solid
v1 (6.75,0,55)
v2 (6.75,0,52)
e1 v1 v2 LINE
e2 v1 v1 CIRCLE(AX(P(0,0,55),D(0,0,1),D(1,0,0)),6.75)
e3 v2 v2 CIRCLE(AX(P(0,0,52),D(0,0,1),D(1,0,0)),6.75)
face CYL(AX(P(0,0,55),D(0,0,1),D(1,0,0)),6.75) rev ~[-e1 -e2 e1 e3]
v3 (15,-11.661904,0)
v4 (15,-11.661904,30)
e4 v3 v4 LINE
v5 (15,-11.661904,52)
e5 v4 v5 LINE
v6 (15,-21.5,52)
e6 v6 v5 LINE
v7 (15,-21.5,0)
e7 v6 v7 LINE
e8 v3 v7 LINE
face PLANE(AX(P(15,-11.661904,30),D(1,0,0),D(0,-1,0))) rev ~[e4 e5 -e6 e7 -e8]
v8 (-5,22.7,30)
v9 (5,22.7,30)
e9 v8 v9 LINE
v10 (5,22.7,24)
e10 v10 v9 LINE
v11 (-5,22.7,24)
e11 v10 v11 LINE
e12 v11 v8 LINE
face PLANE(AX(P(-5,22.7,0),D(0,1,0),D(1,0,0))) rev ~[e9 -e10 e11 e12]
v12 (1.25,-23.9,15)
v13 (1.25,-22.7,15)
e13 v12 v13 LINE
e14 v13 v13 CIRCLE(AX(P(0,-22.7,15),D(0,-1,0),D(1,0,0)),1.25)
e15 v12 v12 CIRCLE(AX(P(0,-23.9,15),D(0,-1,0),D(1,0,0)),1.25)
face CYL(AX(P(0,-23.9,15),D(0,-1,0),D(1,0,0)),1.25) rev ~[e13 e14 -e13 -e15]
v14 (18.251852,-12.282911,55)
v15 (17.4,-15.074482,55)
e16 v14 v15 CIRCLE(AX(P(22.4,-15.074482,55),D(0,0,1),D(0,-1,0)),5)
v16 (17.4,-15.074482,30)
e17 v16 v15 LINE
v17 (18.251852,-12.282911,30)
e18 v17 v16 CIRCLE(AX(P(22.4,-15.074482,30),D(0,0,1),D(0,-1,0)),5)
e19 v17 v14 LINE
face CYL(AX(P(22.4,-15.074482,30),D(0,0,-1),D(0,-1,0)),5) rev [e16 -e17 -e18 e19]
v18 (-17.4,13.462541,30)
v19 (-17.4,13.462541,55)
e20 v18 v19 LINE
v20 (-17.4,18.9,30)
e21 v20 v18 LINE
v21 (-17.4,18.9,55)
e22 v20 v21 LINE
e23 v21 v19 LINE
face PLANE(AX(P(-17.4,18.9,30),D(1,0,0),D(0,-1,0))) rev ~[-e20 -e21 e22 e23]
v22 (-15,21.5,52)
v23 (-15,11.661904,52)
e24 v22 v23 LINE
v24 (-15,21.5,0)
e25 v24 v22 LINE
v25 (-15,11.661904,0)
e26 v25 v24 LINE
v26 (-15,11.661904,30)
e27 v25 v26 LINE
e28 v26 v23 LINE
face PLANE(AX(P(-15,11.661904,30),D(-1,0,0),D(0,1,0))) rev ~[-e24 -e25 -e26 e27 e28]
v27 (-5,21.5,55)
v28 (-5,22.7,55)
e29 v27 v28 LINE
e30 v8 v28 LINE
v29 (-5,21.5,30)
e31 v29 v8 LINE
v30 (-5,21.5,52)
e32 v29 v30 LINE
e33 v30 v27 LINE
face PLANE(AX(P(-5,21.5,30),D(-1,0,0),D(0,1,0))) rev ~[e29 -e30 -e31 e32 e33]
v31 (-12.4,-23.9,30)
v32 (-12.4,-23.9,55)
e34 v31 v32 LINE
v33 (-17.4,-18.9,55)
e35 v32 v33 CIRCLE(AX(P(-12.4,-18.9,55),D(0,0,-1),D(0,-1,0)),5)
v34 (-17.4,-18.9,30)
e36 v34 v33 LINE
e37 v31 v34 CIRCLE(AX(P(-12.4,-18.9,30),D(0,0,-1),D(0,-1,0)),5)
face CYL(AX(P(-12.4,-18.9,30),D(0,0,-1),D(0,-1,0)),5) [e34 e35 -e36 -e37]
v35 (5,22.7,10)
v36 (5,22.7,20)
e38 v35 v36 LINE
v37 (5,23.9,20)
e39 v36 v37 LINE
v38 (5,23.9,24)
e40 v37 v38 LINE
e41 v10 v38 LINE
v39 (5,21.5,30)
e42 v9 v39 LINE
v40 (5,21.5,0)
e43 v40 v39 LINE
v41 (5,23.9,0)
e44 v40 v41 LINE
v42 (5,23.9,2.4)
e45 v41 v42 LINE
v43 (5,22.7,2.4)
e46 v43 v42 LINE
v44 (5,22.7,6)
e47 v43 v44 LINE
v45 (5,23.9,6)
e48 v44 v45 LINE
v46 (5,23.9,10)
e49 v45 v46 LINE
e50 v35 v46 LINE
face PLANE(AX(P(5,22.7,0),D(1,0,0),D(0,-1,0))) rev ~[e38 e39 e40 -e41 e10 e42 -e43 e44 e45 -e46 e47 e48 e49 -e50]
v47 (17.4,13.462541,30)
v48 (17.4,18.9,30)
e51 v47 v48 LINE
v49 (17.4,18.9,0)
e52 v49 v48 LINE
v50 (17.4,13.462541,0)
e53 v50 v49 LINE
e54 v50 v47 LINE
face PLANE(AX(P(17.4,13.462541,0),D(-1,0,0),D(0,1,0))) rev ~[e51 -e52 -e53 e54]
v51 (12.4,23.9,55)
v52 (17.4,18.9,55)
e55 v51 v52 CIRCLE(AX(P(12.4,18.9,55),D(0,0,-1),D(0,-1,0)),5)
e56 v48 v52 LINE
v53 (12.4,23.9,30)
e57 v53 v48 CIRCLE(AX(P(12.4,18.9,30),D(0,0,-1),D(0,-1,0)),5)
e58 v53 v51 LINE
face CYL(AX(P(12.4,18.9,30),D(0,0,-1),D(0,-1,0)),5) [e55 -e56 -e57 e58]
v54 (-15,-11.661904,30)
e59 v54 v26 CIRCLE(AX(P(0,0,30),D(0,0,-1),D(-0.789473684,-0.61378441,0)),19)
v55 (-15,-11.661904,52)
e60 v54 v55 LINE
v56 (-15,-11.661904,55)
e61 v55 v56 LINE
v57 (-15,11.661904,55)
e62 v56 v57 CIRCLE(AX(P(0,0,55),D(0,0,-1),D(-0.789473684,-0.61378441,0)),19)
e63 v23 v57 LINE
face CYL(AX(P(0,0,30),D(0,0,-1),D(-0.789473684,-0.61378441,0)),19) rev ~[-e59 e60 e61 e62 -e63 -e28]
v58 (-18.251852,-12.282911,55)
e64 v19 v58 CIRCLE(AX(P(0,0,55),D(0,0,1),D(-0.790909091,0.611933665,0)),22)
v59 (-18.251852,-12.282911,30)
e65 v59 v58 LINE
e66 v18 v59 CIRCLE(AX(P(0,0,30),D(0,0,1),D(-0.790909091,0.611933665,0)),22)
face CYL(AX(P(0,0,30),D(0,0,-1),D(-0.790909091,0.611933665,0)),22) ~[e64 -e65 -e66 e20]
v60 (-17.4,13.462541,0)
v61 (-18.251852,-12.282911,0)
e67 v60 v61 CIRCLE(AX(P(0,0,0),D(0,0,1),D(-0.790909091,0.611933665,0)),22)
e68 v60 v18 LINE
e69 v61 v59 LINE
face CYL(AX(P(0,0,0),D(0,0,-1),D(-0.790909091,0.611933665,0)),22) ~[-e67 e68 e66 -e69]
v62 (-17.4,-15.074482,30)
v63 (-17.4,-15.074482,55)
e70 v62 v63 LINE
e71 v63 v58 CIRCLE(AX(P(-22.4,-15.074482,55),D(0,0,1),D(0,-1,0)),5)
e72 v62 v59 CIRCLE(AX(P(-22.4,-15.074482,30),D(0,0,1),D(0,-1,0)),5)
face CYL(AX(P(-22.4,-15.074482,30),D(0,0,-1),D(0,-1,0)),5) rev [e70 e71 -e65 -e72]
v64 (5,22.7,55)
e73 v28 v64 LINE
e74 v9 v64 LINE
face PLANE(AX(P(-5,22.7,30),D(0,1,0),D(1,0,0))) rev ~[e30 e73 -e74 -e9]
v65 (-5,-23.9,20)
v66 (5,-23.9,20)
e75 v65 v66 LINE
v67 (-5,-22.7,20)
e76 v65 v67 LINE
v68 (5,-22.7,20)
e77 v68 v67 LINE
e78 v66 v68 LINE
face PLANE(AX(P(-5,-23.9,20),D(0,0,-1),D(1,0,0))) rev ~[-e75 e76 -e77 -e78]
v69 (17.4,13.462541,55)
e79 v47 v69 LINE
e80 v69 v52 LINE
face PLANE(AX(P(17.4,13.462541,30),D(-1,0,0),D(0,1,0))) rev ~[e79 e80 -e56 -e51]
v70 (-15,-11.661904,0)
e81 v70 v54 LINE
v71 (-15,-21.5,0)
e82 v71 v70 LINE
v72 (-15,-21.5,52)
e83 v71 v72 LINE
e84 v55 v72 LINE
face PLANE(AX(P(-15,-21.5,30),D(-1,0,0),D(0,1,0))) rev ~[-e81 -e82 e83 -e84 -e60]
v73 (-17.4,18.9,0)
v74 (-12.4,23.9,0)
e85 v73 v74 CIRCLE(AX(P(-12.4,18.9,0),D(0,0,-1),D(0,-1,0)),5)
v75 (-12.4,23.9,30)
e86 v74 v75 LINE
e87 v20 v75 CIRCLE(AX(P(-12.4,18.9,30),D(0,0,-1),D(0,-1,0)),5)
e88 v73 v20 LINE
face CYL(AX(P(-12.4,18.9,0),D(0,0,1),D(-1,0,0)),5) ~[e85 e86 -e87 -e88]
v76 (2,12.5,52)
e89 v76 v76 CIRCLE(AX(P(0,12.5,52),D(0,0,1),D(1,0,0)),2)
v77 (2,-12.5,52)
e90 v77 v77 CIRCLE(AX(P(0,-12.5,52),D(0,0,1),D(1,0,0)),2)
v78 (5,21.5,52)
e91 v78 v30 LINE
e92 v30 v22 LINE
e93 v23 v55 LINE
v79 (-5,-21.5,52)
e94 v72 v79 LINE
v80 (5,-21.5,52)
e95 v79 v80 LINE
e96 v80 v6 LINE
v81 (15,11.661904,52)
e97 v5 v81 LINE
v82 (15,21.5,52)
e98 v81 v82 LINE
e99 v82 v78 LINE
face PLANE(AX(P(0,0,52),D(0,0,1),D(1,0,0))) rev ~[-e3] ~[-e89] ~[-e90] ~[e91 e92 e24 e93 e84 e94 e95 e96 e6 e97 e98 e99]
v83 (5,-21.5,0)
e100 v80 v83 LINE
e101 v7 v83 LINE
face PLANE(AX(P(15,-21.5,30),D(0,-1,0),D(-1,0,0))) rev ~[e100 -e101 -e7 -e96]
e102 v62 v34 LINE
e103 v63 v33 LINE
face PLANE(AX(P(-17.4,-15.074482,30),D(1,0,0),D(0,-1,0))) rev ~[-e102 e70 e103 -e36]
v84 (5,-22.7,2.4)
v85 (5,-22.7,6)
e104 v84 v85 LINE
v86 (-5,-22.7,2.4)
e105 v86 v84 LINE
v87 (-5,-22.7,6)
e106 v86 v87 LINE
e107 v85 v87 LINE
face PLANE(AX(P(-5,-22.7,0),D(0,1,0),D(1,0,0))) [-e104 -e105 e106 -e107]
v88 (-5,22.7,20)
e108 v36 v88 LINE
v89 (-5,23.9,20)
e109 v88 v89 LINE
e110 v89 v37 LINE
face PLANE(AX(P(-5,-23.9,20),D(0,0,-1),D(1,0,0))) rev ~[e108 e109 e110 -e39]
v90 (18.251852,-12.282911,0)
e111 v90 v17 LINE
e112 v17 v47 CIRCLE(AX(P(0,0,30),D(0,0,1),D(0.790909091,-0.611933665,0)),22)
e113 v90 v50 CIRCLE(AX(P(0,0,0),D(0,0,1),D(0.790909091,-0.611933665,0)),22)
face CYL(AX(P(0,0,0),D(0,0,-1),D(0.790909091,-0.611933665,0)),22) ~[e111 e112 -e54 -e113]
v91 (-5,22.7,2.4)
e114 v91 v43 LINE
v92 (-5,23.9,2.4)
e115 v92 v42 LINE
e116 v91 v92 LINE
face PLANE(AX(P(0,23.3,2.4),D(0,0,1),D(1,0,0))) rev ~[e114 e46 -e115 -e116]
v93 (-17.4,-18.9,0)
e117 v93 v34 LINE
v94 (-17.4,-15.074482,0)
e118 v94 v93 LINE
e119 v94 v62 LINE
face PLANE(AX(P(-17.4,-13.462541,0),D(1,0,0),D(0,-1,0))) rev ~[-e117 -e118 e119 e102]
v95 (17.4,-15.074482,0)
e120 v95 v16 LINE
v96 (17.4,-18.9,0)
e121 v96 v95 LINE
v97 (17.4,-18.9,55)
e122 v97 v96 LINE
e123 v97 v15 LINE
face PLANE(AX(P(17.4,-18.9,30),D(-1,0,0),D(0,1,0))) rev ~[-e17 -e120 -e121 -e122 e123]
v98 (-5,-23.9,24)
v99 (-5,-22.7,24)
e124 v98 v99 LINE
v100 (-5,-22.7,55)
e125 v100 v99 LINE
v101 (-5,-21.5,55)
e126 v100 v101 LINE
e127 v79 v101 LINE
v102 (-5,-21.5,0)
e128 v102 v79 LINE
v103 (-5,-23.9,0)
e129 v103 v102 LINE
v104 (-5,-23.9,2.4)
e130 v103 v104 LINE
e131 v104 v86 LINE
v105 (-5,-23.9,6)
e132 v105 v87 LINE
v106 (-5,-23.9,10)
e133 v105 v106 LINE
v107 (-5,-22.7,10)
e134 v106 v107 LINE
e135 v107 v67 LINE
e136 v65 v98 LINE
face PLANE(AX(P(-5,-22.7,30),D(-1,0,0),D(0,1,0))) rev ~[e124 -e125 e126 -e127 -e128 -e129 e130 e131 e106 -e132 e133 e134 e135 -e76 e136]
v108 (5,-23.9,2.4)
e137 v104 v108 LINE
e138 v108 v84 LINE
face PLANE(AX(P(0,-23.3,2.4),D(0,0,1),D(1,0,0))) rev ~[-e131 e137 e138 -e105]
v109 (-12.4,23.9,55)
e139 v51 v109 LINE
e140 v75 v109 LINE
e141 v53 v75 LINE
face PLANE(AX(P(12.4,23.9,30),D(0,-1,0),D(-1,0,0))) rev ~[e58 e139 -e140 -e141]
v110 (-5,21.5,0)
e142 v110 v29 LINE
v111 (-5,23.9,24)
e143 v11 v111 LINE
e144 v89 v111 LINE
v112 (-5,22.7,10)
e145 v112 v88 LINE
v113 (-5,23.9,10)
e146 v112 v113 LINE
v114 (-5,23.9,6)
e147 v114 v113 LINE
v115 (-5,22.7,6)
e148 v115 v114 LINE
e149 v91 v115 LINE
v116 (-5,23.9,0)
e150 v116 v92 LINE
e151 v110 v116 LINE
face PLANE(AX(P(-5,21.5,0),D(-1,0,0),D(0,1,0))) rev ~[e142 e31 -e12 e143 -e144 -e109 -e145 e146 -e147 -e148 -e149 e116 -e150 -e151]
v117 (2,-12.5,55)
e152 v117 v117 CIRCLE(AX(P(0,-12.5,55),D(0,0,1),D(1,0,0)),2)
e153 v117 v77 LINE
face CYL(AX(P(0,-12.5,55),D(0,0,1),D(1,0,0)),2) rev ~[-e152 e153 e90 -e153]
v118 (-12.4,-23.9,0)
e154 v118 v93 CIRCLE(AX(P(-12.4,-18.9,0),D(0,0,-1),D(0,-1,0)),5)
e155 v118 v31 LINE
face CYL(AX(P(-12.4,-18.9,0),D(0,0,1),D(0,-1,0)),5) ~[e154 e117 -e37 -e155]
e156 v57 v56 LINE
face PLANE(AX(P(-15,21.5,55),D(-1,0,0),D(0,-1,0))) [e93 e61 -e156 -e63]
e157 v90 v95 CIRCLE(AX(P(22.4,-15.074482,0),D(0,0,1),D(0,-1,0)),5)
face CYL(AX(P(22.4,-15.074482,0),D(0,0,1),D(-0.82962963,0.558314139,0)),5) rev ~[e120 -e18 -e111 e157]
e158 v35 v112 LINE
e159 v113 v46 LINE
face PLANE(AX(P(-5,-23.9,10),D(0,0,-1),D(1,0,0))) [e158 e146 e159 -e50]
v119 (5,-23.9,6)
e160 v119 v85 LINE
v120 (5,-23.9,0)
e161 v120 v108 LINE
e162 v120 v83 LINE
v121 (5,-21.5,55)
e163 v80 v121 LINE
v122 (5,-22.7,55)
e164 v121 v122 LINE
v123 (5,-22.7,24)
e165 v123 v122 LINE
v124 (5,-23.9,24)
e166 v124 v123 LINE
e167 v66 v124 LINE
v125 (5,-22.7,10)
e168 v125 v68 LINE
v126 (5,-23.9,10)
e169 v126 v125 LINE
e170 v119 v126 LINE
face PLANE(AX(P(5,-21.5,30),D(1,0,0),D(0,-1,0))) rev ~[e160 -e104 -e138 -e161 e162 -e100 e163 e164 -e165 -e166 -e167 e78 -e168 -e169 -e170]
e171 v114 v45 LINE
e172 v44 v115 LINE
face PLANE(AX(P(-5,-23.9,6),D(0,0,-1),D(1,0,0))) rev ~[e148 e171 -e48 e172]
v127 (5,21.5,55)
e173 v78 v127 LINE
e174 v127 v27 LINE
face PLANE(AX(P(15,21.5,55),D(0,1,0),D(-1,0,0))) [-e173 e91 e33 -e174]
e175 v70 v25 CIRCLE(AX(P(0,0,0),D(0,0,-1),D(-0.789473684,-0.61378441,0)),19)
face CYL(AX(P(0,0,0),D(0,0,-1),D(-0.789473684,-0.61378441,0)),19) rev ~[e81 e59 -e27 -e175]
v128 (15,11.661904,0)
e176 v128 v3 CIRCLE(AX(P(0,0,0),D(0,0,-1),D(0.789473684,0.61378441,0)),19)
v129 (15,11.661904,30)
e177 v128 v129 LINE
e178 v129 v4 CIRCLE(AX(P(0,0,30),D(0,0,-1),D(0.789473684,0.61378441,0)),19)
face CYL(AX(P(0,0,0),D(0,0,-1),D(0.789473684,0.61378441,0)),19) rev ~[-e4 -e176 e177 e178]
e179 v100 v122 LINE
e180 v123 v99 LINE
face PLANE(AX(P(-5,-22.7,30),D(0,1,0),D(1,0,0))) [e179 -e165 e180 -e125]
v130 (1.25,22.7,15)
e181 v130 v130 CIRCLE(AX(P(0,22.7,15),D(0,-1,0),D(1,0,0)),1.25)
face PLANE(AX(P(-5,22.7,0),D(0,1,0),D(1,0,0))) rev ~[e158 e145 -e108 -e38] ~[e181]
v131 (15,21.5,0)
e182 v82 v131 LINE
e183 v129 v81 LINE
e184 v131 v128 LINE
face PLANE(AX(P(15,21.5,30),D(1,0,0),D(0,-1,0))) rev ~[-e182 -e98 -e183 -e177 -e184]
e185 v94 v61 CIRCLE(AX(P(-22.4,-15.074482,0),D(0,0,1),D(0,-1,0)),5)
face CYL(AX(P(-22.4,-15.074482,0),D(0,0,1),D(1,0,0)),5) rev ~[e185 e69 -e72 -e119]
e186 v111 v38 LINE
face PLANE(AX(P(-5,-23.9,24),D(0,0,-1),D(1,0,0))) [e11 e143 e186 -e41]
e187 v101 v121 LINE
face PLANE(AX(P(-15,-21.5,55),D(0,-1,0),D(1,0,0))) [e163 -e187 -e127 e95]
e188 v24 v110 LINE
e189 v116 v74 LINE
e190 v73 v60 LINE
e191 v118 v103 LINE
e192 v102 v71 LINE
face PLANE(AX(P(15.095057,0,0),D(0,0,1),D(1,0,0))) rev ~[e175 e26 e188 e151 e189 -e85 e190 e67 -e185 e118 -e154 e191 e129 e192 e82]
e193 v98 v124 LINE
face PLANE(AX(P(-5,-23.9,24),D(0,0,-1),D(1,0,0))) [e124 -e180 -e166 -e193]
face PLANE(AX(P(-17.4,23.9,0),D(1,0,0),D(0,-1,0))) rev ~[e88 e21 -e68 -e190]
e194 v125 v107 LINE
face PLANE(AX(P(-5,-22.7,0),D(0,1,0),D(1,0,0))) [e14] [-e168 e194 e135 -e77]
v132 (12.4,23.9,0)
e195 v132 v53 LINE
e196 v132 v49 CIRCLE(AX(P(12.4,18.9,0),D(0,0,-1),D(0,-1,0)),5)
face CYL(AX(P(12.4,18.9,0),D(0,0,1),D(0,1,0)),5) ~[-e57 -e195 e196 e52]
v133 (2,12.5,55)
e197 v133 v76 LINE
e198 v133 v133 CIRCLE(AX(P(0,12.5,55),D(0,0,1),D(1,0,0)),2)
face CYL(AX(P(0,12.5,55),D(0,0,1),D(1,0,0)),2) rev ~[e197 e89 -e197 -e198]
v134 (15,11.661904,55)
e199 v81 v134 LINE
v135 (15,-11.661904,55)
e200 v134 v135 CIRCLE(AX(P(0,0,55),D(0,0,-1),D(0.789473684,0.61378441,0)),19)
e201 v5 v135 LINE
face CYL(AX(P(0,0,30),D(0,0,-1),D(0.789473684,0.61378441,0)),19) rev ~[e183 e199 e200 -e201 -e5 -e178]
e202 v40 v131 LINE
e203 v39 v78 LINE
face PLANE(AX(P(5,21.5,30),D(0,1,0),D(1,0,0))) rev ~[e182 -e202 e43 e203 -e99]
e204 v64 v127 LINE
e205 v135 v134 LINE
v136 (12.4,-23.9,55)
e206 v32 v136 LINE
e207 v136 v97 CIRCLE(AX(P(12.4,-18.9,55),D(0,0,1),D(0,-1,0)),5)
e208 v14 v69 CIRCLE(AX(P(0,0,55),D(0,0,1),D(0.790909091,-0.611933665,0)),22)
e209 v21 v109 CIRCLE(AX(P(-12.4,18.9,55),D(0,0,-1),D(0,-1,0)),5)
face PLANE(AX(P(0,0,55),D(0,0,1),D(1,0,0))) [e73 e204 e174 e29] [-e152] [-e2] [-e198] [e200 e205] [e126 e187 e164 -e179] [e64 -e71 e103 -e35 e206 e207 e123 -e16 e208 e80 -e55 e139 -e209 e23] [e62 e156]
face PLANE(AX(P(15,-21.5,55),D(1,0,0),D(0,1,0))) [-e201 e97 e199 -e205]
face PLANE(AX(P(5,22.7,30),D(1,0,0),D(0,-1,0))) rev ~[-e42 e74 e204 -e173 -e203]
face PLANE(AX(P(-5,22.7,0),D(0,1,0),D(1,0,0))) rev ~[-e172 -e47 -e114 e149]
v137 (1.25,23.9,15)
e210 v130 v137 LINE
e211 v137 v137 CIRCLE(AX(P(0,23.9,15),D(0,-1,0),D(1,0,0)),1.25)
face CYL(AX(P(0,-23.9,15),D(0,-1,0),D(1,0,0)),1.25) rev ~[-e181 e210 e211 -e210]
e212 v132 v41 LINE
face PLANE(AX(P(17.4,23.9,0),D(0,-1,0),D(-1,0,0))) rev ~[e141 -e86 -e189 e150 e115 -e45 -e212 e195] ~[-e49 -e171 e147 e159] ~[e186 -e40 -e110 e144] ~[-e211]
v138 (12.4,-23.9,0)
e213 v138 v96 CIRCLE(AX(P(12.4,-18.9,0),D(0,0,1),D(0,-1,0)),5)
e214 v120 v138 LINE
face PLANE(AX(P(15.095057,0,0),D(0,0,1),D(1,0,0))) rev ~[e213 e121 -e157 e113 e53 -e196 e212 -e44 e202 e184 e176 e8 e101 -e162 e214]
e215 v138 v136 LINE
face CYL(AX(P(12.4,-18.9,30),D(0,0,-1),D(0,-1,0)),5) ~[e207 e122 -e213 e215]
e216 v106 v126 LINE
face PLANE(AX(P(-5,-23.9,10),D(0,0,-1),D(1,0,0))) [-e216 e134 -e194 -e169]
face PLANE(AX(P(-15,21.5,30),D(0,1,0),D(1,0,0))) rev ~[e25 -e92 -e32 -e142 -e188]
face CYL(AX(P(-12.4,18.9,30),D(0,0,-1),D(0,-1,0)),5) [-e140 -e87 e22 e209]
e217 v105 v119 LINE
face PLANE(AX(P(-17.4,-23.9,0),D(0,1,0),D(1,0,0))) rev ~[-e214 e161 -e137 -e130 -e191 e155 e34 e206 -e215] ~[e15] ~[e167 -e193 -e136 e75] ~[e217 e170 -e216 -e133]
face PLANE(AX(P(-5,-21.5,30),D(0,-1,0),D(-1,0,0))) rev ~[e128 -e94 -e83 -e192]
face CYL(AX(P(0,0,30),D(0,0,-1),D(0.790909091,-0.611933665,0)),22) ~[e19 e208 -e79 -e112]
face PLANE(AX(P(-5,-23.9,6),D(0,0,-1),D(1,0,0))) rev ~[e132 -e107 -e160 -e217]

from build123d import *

# Parameters (mm, degrees)
F0_W     = 10
F0_H     = 1.2
F1_DEPTH = 30
F2_W     = 10
F2_H     = 4
F2_R     = 1.25
F3_DEPTH = 47.801
F4_DEPTH = 2.4
F5_R     = 5
F6_DEPTH = 25
F7_R     = 2
F7_R_2   = 6.75
F8_DEPTH = 3


# Not quite as in the source:
# - a feature names something its author has since deleted; it is built from what else it names


with BuildPart() as f1:
    # F0 (on Top) → F1 (new body)
    with BuildSketch(Plane.XY):
        with BuildLine():
            Line((15, -11.6619037897), (15, -21.5))
            Line((15, -21.5), (5, -21.5))
            Line((5, -21.5), (5, -22.7))
            Line((5, -22.7), (5, -23.9))
            Line((5, -23.9), (17.4, -23.9))
            Line((17.4, -23.9), (17.4, -13.462540622))
            ThreePointArc((17.4, -13.462540622), (22, 0), (17.4, 13.462540622))
            Line((17.4, 13.462540622), (17.4, 23.9))
            Line((17.4, 23.9), (5, 23.9))
            Line((5, 23.9), (5, 22.7))
            Line((5, 22.7), (5, 21.5))
            Line((5, 21.5), (15, 21.5))
            Line((15, 21.5), (15, 11.6619037897))
            ThreePointArc((15, 11.6619037897), (19, 0), (15, -11.6619037897))
        make_face()
        with Locations((0, 23.3)):
            Rectangle(F0_W, F0_H)
        with BuildLine():
            Line((-5, -23.9), (-5, -22.7))
            Line((-5, -22.7), (-5, -21.5))
            Line((-5, -21.5), (-15, -21.5))
            Line((-15, -21.5), (-15, -11.6619037897))
            ThreePointArc((-15, -11.6619037897), (-19, 0), (-15, 11.6619037897))
            Line((-15, 11.6619037897), (-15, 21.5))
            Line((-15, 21.5), (-5, 21.5))
            Line((-5, 21.5), (-5, 22.7))
            Line((-5, 22.7), (-5, 23.9))
            Line((-5, 23.9), (-17.4, 23.9))
            Line((-17.4, 23.9), (-17.4, 13.462540622))
            ThreePointArc((-17.4, 13.462540622), (-22, 0), (-17.4, -13.462540622))
            Line((-17.4, -13.462540622), (-17.4, -23.9))
            Line((-17.4, -23.9), (-5, -23.9))
        make_face()
        with Locations((0, -23.3)):
            Rectangle(F0_W, F0_H)
    extrude(amount=F1_DEPTH)

    # F2 (on face) → F3 (cut, through all)
    with BuildSketch(Plane.XZ.offset(23.9)):
        with Locations((0, 22)):
            Rectangle(F2_W, F2_H)
        with Locations((0, 8)):
            Rectangle(F2_W, F2_H)
        with Locations((0, 15)):
            Circle(F2_R)
    extrude(amount=-F3_DEPTH, mode=Mode.SUBTRACT)

    # F0 (on Top) → F4 (cut)
    with BuildSketch(Plane.XY):
        with Locations((0, 23.3)):
            Rectangle(F0_W, F0_H)
        with Locations((0, -23.3)):
            Rectangle(F0_W, F0_H)
    extrude(amount=F4_DEPTH, mode=Mode.SUBTRACT)

    # F5
    f5_edges = [f1.edges().sort_by_distance(p)[0] for p in [
        (-17.4, -23.9, 15),
        (17.4, -23.9, 15),
        (-17.4, -13.462541, 15),
        (-17.4, 23.9, 15),
        (17.4, 23.9, 15),
        (17.4, -13.462541, 15),
    ]]
    fillet(f5_edges, radius=F5_R)

    # F6 (add): a face of the model
    f6_faces = [f1.faces().sort_by_distance(p)[0] for p in [
        (16.7503200788, -16.9872408745, 30),
    ]]
    extrude(f6_faces, amount=F6_DEPTH)

    # F7 (on face) → F8 (join)
    with BuildSketch(Plane.XY.offset(55)):
        Polygon((-15, -11.6619037897), (-15, -21.5), (-5, -21.5), (5, -21.5), (15, -21.5), (15, -11.6619037897), (15, 11.6619037897), (15, 21.5), (5, 21.5), (-5, 21.5), (-15, 21.5), (-15, 11.6619037897), align=None)
        with Locations((0, -12.5)):
            Circle(F7_R, mode=Mode.SUBTRACT)
        Circle(F7_R_2, mode=Mode.SUBTRACT)
        with Locations((0, 12.5)):
            Circle(F7_R, mode=Mode.SUBTRACT)
    extrude(amount=-F8_DEPTH)


solid = f1.part
